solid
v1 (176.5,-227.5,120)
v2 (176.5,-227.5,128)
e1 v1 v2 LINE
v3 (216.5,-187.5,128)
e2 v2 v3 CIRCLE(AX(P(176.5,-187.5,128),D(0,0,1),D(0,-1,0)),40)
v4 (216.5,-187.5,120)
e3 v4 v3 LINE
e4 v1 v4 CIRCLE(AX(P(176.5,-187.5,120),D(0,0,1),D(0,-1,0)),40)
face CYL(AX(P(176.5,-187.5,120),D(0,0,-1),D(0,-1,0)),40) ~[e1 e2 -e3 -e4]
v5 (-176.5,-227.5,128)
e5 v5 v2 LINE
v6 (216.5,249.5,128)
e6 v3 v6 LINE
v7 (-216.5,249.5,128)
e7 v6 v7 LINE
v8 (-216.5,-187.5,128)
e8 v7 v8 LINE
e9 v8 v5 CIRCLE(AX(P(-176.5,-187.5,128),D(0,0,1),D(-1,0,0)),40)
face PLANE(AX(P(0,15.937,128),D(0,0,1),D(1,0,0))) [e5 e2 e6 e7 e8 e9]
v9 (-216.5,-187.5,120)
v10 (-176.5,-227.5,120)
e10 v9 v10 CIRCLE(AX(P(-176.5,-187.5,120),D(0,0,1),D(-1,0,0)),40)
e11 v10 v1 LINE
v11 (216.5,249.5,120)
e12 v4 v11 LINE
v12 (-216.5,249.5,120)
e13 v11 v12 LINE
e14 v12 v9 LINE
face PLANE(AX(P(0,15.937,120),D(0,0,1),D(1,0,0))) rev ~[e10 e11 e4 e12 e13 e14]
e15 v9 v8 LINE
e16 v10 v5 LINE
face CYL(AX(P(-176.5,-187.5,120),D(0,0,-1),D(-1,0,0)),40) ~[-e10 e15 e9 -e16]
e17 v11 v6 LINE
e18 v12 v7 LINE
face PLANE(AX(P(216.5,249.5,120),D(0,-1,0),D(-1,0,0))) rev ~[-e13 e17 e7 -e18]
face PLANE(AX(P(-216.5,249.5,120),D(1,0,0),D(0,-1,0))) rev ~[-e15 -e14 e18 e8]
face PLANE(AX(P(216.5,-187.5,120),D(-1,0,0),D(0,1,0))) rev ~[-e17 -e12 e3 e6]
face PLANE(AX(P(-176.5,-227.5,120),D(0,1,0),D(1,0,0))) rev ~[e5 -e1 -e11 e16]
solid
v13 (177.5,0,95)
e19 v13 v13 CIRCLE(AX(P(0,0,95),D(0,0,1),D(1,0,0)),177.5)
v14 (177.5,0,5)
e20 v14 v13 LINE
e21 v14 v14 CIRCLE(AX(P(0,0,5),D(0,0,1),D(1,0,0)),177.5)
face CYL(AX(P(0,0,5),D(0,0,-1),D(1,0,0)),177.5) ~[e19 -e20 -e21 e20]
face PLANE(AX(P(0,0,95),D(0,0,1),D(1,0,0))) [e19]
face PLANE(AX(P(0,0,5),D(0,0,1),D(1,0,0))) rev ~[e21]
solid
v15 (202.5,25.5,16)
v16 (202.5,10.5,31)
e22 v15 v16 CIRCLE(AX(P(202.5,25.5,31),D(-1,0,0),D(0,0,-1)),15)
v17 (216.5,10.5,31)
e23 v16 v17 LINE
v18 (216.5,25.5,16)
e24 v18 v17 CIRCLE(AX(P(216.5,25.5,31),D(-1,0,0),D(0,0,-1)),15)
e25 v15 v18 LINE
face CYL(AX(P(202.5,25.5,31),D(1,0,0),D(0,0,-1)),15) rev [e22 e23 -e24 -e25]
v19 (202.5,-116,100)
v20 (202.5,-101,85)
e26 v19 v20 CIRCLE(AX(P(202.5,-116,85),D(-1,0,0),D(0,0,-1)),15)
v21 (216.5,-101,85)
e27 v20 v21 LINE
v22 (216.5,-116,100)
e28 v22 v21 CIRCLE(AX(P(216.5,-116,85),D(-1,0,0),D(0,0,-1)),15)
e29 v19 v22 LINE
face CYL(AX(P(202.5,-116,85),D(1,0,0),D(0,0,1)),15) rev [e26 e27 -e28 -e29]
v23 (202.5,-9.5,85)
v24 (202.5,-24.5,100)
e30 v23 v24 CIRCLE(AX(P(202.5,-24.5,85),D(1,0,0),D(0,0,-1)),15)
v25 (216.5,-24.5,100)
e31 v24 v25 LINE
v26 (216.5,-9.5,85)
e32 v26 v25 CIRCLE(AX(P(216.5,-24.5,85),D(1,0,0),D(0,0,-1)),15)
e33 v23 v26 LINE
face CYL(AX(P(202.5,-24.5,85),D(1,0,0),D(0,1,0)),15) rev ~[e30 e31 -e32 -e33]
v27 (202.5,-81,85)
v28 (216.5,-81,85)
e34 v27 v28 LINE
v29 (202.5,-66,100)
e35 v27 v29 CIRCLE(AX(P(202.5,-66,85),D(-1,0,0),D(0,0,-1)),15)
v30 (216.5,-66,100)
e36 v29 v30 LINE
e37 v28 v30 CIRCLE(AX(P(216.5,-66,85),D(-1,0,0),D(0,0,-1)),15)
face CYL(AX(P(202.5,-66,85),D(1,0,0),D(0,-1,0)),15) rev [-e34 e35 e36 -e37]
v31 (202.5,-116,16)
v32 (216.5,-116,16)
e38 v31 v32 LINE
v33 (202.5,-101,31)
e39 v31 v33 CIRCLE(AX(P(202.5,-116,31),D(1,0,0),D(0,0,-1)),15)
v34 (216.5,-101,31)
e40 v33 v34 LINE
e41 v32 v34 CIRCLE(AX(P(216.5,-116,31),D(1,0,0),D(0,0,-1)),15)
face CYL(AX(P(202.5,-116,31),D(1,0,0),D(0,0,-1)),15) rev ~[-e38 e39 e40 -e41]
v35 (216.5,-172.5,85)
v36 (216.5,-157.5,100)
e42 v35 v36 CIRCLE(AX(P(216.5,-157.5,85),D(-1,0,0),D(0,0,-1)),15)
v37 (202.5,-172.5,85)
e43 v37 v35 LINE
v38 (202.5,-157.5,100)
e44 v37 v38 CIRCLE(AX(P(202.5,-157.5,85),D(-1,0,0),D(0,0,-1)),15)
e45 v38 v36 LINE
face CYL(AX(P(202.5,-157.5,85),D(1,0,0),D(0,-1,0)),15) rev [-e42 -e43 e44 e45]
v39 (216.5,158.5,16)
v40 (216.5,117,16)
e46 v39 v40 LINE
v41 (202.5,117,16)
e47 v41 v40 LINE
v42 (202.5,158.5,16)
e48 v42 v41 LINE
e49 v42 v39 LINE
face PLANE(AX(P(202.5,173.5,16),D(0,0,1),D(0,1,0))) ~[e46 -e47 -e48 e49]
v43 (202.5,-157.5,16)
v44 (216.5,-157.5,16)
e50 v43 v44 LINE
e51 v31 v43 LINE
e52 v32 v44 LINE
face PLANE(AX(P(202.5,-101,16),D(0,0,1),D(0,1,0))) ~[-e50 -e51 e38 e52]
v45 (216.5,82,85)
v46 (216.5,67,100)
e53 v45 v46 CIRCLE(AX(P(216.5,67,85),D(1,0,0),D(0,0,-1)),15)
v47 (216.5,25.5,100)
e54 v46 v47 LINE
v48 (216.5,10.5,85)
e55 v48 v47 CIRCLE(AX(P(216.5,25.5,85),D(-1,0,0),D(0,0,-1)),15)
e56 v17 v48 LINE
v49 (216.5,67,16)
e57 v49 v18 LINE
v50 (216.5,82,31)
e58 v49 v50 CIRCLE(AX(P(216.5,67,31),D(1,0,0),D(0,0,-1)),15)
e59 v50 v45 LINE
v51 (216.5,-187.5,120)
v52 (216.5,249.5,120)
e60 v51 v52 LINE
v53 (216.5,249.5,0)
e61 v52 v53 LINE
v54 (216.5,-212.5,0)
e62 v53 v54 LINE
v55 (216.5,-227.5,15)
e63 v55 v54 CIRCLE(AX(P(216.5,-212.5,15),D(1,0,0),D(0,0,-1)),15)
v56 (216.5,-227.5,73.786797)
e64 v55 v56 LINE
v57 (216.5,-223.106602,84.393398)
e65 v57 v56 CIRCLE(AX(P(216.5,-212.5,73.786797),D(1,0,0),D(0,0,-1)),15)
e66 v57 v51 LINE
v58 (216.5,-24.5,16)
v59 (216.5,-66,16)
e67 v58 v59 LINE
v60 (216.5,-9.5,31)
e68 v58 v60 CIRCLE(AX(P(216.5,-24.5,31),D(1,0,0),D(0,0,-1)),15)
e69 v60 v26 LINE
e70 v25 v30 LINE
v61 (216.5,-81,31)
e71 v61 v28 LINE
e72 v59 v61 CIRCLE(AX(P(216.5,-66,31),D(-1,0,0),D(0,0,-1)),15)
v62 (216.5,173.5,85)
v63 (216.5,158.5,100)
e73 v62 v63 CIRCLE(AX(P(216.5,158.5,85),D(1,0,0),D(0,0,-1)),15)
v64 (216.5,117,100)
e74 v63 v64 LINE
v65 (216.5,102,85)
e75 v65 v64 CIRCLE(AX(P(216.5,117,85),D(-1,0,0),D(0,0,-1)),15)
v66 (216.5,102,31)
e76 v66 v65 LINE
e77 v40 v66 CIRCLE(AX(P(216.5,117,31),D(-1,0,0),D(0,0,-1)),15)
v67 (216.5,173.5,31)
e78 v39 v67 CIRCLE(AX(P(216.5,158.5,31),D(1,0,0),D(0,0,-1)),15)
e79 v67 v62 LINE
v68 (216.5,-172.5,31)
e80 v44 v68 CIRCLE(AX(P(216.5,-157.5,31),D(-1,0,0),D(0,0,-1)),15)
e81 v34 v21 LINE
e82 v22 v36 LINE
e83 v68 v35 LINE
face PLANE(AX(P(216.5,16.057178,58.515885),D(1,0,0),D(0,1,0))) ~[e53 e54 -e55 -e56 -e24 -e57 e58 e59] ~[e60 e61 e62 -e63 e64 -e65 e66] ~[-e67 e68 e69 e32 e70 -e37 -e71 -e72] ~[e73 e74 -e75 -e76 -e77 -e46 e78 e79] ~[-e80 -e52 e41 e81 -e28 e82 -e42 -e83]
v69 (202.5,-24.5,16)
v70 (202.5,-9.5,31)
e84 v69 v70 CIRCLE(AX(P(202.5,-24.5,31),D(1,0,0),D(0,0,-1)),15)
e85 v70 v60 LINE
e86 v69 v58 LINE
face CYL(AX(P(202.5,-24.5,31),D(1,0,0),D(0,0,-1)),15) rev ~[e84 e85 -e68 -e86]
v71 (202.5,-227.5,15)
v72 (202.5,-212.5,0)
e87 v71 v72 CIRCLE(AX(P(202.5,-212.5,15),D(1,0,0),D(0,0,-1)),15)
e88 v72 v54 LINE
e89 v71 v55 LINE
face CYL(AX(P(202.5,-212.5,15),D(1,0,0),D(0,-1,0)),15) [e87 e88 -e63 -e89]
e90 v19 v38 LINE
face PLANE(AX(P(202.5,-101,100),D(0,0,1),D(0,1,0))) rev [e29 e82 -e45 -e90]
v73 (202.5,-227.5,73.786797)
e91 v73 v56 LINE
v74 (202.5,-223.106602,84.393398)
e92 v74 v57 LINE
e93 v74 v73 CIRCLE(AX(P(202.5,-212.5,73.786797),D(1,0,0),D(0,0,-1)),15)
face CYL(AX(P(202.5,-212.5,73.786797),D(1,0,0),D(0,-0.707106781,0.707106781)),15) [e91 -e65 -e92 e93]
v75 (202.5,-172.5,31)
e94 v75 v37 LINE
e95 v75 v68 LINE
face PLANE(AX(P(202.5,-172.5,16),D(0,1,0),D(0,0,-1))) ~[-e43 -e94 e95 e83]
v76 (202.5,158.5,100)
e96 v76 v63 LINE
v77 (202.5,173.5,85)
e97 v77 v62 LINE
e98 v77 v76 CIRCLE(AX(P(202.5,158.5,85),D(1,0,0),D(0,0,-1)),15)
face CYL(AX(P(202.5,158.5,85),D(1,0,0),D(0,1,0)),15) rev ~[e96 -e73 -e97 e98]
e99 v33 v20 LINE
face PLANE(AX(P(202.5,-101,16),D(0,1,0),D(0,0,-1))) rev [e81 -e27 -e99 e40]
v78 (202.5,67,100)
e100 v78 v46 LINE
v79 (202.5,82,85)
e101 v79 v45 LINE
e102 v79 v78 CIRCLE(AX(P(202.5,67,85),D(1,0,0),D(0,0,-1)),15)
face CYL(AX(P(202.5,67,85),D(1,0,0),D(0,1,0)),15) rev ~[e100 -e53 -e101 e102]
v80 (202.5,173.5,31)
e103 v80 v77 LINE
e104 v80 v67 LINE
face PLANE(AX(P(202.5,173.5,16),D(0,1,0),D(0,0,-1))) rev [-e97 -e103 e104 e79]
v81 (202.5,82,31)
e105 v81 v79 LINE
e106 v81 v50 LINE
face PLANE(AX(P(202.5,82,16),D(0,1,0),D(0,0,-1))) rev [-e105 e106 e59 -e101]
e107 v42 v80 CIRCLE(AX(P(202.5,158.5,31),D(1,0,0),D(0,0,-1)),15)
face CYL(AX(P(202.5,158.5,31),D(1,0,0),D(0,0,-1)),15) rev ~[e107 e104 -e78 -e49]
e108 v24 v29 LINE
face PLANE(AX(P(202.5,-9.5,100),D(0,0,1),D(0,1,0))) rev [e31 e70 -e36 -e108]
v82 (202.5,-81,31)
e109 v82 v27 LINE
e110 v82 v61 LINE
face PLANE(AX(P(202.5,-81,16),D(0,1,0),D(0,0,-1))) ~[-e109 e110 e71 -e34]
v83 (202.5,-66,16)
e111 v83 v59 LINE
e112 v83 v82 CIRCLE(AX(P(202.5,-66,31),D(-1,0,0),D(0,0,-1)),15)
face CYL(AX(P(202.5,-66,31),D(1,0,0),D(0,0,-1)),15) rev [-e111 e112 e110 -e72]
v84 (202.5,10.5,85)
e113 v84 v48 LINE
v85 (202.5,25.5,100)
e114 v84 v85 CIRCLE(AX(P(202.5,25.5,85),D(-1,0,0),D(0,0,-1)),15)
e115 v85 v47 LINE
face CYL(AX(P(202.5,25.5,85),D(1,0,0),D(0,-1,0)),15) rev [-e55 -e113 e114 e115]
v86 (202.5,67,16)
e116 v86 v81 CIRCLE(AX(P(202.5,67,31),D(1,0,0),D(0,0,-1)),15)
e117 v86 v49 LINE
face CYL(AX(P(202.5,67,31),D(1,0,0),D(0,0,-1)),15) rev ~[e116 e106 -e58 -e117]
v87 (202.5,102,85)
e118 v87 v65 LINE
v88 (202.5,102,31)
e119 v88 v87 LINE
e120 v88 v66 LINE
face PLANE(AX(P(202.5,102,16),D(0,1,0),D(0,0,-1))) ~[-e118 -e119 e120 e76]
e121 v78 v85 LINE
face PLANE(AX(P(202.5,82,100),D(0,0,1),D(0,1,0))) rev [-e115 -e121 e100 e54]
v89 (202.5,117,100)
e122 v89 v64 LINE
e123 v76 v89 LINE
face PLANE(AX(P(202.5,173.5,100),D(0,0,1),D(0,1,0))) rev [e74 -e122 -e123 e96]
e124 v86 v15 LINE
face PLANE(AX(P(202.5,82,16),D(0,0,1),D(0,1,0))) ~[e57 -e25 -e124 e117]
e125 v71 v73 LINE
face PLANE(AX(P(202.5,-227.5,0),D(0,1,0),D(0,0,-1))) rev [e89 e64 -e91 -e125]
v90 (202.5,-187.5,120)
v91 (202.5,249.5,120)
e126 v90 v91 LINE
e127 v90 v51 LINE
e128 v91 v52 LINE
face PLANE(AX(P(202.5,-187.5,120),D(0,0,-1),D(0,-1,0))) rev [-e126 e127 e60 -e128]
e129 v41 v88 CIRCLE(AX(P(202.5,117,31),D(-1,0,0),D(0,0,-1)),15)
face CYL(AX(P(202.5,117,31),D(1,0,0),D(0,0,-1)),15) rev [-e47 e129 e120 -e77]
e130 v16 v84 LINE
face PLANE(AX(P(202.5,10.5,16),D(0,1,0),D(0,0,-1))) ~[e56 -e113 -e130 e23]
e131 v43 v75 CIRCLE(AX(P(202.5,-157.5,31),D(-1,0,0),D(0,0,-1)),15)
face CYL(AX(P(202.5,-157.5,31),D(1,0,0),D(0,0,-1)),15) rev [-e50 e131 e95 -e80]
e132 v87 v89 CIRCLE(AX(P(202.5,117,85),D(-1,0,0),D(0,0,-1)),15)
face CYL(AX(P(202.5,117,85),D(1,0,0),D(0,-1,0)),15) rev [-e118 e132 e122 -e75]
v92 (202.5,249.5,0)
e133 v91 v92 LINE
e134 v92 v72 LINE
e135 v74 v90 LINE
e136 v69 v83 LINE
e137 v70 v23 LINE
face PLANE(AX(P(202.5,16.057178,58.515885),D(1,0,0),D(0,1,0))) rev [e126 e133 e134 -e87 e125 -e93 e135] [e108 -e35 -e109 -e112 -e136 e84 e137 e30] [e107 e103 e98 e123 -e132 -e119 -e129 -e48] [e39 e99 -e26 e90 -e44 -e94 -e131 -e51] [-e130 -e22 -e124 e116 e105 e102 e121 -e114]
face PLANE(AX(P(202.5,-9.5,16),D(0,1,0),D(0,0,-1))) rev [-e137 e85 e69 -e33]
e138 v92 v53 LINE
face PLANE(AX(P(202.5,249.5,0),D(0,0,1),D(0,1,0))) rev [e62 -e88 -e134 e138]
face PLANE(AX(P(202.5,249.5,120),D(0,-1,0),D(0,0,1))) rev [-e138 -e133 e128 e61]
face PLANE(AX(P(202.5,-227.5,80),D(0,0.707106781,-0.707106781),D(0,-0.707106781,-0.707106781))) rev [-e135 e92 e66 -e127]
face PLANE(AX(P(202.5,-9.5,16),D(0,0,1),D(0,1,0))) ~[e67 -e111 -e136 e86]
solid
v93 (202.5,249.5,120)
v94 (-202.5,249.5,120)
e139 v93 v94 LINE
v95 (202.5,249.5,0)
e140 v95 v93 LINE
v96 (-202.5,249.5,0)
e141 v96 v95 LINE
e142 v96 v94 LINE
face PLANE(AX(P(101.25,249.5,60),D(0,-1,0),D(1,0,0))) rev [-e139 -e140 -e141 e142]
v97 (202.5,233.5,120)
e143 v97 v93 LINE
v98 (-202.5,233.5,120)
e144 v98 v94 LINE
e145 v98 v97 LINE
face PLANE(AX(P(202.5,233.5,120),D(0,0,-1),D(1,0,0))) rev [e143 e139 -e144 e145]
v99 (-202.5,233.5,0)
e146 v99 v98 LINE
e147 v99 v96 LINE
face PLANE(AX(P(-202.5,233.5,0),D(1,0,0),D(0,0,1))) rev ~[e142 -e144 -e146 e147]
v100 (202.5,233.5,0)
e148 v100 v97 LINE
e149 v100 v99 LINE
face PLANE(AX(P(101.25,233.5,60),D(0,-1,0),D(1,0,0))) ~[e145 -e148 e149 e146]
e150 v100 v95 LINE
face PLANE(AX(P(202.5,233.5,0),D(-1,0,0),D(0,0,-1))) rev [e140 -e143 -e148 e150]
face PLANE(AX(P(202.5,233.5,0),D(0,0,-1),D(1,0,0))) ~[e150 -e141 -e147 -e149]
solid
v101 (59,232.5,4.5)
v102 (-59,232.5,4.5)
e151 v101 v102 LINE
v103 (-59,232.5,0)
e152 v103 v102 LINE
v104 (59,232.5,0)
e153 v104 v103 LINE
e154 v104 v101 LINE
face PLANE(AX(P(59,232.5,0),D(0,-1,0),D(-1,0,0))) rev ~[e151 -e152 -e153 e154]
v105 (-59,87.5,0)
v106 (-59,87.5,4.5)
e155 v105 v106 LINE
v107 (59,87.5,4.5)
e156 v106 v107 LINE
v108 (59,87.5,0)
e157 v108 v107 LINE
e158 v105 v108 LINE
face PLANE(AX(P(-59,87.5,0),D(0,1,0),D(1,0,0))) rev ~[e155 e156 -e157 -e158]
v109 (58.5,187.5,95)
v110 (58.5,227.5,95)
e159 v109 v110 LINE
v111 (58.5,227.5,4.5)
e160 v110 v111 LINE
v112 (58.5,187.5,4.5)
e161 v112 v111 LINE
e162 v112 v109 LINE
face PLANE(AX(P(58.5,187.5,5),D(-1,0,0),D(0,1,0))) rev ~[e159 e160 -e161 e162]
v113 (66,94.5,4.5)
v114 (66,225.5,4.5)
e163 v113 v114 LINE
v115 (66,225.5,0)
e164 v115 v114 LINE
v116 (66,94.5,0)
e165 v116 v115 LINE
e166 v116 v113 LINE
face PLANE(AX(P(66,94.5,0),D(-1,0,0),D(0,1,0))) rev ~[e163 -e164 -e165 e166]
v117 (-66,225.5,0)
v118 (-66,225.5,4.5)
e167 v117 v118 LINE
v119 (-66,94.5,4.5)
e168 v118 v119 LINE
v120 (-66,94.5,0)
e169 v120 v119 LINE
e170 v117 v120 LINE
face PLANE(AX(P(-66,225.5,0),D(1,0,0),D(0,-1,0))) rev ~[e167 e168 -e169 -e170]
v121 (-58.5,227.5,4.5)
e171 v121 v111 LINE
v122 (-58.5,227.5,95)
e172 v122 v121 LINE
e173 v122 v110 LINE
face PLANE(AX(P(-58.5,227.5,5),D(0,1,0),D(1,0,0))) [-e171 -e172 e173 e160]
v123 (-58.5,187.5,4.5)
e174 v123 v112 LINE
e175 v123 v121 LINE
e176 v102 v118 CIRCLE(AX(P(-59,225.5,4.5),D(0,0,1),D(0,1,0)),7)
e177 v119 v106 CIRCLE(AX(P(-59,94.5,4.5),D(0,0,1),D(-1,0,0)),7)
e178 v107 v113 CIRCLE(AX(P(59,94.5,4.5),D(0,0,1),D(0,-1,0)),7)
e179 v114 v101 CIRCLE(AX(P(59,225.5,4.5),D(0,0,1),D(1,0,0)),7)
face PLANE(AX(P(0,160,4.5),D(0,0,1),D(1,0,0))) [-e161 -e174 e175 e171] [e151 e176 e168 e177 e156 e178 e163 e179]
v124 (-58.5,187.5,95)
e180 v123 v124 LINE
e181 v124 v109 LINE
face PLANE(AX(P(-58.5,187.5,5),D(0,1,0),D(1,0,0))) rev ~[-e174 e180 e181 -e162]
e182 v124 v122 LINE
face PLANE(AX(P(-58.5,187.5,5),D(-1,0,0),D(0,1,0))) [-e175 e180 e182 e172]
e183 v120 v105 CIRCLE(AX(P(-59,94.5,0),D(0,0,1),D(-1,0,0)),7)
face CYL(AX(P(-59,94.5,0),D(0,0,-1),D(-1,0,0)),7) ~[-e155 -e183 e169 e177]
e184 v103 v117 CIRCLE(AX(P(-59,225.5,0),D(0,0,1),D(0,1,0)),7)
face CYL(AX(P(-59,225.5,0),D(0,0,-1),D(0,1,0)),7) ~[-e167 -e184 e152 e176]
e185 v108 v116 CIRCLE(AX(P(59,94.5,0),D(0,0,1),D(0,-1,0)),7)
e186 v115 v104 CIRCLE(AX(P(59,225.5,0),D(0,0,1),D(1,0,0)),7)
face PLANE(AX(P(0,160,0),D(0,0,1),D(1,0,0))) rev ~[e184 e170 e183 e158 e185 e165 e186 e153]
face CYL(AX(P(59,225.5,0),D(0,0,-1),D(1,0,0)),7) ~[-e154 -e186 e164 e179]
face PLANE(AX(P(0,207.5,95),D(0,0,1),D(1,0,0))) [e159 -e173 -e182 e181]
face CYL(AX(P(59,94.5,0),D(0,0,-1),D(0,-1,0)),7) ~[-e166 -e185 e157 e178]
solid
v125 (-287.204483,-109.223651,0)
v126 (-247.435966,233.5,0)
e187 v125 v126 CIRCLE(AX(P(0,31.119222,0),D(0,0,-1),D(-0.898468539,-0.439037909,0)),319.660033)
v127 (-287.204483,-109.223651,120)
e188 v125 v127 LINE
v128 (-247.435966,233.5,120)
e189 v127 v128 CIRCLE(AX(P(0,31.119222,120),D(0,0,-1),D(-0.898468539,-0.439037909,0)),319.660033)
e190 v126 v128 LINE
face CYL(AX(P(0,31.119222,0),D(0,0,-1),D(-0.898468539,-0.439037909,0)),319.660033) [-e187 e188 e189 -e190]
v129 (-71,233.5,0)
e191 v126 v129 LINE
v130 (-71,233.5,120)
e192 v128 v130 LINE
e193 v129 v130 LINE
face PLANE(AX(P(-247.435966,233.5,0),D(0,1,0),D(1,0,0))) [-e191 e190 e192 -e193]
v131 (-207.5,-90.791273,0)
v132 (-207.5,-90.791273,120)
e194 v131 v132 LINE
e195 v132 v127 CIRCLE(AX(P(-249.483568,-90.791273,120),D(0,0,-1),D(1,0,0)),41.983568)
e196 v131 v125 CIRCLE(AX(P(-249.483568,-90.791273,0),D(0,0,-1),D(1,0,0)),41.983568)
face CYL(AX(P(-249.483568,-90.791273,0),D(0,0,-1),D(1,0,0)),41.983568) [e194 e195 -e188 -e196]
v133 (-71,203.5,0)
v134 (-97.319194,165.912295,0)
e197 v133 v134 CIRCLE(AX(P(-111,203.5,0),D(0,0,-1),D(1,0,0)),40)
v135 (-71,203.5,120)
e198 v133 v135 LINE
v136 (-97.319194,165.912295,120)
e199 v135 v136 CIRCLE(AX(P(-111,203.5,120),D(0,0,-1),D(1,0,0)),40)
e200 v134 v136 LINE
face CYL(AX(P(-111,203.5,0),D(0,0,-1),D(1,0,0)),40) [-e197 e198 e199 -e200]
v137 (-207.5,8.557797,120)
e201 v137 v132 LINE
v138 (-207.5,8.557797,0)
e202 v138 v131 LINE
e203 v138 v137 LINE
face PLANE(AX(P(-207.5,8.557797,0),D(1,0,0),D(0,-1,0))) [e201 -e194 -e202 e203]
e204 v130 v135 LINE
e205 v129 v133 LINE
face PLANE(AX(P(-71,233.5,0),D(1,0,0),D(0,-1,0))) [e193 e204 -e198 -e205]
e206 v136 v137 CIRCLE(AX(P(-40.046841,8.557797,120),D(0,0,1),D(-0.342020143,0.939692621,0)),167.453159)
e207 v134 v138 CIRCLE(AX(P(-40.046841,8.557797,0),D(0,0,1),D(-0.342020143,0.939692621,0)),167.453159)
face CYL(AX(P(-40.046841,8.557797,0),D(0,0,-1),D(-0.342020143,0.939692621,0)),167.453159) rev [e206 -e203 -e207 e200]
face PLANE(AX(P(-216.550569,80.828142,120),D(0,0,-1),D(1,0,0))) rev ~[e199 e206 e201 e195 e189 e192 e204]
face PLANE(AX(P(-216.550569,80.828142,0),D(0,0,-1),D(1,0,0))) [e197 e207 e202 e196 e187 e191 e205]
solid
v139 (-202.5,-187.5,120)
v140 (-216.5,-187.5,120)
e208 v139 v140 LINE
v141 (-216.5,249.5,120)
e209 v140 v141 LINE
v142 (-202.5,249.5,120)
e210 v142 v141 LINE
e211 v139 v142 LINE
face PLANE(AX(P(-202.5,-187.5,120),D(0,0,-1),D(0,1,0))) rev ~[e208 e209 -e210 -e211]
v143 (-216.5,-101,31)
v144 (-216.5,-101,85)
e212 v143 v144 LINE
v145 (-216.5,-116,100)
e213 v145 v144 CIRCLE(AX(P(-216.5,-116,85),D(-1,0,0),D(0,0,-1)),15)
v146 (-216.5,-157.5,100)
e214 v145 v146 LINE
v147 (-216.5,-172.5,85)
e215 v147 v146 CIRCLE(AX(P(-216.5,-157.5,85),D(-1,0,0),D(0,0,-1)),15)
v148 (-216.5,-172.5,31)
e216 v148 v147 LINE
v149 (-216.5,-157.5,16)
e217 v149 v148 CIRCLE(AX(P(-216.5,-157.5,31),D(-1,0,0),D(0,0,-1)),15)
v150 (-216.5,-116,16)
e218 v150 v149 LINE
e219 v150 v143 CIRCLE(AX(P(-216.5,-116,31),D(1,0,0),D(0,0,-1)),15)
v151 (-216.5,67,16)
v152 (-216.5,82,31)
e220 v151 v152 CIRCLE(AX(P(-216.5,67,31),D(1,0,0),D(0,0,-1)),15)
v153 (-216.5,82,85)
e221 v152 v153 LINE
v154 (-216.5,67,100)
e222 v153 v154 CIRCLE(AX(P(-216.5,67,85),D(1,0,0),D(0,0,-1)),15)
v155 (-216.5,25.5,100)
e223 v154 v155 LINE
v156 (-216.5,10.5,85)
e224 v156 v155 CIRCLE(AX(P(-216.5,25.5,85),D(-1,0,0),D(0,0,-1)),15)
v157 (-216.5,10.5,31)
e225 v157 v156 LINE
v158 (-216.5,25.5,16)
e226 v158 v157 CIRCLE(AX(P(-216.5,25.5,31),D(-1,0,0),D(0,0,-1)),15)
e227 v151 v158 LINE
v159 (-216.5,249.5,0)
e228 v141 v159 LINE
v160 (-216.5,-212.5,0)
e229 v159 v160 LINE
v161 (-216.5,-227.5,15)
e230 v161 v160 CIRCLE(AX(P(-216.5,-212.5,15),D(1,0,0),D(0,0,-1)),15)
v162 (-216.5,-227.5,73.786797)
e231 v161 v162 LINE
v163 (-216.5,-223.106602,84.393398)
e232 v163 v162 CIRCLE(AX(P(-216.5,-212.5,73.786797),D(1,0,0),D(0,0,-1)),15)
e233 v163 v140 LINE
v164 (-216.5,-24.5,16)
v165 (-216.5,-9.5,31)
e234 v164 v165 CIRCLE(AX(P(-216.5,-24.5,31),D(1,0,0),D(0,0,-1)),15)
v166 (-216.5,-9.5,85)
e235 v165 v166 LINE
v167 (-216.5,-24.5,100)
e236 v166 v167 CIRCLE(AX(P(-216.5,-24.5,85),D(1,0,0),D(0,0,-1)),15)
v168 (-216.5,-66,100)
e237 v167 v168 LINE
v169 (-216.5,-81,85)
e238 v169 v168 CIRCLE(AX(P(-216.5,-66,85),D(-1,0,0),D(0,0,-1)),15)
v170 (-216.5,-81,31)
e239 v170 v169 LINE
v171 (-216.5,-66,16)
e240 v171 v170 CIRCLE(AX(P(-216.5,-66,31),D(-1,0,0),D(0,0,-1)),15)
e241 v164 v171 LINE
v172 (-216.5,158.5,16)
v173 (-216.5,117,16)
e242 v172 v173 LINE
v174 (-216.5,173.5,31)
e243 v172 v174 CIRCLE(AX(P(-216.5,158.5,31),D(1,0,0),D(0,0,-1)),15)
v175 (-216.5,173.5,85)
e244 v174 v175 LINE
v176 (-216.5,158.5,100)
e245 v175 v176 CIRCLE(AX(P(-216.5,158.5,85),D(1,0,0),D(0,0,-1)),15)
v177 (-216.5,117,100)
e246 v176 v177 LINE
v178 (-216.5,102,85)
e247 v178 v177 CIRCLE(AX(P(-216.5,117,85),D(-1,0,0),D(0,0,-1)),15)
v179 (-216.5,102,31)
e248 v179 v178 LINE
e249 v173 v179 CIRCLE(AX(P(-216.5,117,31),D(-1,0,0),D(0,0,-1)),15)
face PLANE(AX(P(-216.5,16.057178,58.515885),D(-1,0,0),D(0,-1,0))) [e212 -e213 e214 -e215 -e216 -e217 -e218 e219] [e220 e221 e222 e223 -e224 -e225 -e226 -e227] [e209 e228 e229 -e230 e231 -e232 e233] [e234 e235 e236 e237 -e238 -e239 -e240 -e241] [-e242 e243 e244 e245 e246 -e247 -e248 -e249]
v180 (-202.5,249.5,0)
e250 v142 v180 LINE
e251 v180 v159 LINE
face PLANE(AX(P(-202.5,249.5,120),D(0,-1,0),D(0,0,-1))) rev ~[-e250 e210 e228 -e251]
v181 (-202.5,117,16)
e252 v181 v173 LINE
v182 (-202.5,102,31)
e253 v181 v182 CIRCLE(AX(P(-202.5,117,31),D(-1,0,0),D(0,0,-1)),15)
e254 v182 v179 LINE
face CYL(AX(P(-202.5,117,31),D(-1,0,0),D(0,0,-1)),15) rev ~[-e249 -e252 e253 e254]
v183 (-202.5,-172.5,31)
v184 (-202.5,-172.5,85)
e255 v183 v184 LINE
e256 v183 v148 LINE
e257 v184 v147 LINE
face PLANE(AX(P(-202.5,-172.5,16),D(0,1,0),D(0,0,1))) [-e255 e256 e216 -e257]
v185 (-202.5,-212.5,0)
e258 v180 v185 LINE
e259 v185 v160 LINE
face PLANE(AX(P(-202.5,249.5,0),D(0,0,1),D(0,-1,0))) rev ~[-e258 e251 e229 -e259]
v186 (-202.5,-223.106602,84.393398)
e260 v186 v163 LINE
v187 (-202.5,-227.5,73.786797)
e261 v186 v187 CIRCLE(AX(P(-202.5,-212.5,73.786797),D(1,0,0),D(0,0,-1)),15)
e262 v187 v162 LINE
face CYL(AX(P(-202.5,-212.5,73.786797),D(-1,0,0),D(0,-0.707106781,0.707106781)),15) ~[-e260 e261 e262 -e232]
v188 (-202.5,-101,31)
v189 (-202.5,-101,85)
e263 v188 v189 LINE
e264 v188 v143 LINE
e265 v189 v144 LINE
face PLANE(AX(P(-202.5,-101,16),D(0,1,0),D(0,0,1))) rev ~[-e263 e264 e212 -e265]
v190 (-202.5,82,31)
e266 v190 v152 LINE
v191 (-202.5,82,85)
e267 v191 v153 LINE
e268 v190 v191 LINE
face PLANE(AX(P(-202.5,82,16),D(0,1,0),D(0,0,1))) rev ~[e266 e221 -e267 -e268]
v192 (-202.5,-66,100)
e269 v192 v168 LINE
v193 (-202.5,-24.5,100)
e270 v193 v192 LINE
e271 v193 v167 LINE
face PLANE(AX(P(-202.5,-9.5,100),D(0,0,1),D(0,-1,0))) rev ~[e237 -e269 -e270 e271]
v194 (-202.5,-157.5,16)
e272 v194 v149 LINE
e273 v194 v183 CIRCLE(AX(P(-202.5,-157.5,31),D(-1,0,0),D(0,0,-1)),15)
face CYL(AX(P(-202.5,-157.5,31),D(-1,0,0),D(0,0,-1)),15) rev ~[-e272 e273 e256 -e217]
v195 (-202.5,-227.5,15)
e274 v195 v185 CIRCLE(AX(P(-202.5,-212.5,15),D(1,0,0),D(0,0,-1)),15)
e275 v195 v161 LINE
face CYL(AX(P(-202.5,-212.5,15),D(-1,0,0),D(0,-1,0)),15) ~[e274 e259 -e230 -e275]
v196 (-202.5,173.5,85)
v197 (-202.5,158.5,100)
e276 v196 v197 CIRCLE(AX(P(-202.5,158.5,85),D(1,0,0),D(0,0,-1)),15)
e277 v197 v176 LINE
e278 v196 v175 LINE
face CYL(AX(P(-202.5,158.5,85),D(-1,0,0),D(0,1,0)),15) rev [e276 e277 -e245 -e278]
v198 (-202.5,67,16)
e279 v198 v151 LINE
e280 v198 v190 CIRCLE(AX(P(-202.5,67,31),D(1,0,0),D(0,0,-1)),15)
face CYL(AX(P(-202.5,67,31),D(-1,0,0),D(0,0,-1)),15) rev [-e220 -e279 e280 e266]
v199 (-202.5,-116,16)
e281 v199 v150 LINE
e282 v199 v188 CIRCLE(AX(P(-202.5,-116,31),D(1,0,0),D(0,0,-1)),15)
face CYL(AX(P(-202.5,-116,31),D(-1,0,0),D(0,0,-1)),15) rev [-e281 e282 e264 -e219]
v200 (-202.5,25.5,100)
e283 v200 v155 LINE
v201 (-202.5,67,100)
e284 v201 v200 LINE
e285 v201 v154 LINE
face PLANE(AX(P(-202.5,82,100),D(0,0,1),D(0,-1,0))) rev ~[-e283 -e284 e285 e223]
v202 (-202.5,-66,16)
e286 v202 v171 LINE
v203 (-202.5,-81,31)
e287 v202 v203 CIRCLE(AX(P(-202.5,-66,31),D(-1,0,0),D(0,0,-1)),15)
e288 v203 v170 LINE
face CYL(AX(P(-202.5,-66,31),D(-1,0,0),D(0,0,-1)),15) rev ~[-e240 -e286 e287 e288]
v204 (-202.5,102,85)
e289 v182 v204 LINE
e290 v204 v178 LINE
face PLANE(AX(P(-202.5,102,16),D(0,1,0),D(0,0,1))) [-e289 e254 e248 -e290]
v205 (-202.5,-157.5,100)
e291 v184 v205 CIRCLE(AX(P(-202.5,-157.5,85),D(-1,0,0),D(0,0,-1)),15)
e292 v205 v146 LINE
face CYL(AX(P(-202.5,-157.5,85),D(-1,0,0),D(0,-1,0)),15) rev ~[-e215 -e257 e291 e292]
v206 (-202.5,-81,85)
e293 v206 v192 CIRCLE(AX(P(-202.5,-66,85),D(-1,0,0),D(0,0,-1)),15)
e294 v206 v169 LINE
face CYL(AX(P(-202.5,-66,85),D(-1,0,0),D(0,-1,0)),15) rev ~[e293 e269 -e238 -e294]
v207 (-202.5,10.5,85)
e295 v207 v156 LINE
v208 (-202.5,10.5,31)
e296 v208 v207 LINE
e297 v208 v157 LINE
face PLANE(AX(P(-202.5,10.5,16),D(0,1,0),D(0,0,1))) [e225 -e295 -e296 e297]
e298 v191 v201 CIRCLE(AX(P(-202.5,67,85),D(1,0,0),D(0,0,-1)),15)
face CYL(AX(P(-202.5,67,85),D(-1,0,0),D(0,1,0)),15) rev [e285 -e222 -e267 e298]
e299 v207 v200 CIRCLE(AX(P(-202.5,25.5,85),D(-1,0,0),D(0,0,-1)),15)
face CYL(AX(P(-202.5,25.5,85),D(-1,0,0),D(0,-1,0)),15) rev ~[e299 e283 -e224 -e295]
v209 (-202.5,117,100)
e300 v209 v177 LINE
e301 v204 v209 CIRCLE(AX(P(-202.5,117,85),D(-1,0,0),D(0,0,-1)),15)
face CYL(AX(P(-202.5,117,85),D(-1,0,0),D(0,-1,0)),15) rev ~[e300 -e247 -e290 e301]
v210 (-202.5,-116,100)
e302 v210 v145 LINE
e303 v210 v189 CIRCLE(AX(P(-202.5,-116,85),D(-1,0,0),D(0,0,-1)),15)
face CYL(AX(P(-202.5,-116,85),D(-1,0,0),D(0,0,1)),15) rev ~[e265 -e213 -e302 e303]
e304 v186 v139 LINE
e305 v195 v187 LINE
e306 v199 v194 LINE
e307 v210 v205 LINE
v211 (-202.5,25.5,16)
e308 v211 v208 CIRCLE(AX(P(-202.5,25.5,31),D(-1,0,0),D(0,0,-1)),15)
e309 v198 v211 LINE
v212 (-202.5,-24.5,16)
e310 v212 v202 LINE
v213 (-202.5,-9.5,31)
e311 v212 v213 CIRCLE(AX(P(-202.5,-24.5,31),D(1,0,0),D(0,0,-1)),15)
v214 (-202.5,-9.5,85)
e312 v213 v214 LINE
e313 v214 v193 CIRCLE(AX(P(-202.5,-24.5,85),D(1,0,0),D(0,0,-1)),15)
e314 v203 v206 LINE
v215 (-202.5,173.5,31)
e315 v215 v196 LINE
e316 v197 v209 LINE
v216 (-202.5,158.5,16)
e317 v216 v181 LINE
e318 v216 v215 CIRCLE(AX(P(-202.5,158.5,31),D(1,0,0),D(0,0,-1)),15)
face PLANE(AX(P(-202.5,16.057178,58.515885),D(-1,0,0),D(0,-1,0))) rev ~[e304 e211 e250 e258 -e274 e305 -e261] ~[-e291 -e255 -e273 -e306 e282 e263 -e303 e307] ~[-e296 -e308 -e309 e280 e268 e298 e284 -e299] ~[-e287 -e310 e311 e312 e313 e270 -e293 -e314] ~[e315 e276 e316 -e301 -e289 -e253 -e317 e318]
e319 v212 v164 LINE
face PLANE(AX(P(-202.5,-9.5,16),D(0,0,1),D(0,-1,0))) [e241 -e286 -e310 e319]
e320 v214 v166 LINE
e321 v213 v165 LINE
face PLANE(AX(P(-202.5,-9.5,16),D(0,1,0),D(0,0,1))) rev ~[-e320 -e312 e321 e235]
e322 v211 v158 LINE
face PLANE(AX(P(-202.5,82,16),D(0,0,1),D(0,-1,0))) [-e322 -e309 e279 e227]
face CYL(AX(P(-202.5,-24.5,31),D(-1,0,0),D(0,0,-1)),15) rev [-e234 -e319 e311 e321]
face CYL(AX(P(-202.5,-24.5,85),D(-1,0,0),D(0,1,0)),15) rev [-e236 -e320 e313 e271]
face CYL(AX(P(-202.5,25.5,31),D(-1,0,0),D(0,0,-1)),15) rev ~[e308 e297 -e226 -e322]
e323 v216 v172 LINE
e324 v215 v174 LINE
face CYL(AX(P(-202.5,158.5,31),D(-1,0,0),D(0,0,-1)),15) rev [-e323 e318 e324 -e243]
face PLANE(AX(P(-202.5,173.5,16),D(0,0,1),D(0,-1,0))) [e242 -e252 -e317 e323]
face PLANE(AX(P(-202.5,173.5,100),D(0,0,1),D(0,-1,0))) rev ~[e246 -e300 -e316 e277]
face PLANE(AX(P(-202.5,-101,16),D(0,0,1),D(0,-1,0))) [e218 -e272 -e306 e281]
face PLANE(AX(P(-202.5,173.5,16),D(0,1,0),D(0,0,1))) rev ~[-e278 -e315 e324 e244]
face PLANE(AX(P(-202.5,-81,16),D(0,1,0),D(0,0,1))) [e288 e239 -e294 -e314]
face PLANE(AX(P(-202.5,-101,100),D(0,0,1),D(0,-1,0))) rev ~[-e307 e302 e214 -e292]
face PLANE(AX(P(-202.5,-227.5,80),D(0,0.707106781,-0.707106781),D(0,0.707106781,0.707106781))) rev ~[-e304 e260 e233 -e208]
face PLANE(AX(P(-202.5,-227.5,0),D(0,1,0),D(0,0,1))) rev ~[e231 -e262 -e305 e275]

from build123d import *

# Parameters (mm, degrees)
F2_R          = 177.5
F3_DEPTH      = 90
F4_W          = 117
F4_H          = 40
F5_DEPTH      = 5
F5_DEPTH_BACK = 90
F7_DEPTH      = 4.5
F10_W         = 202.5
F10_H         = 120
F11_DEPTH     = 16
F14_W         = 71.5
F14_H         = 84
F15_DEPTH     = 14
F17_R         = 15
F22_DEPTH     = 8
F24_DEPTH     = 120


# Not quite as in the source:
# - a feature names something its author has since deleted; it is built from what else it names


with BuildPart() as f3:
    # F2 (on plane+point) → F3 (new body)
    with BuildSketch(Plane.XY.offset(5)):
        Circle(F2_R)
    extrude(amount=F3_DEPTH)


with BuildPart() as f5:
    # F4 (on plane+point) → F5 (new body, two sides)
    with BuildSketch(Plane.XY.offset(5)) as f5_sk:
        with Locations((0, 207.5)):
            Rectangle(F4_W, F4_H)
    extrude(amount=-F5_DEPTH)
    extrude(f5_sk.sketch, amount=F5_DEPTH_BACK)

    # F6 (on Top) → F7 (join)
    with BuildSketch(Plane.XY):
        with BuildLine():
            Line((59, 232.5), (-59, 232.5))
            ThreePointArc((-59, 232.5), (-63.9497474683, 230.4497474683), (-66, 225.5))
            Line((-66, 225.5), (-66, 94.5))
            ThreePointArc((-66, 94.5), (-63.9497474683, 89.5502525317), (-59, 87.5))
            Line((-59, 87.5), (59, 87.5))
            ThreePointArc((59, 87.5), (63.9497474683, 89.5502525317), (66, 94.5))
            Line((66, 94.5), (66, 225.5))
            ThreePointArc((66, 225.5), (63.9497474683, 230.4497474683), (59, 232.5))
        make_face()
    extrude(amount=F7_DEPTH)


with BuildPart() as f11:
    # F10 (on plane+point) → F11 (new body)
    with BuildSketch(Plane.XZ.offset(-233.5)):
        with Locations((-101.25, 60)):
            Rectangle(F10_W, F10_H)
    extrude(amount=-F11_DEPTH)


with BuildPart() as f15:
    # F14 (on face) → F15 (new body)
    with BuildSketch(Plane(origin=(-202.5, 0, 0), x_dir=(0, -1, 0), z_dir=(-1, 0, 0))):
        Polygon((187.5, 120), (-249.5, 120), (-249.5, 0), (227.5, 0), (227.5, 80), align=None)
        with Locations((-137.75, 58)):
            Rectangle(F14_W, F14_H, mode=Mode.SUBTRACT)
        with Locations((-46.25, 58)):
            Rectangle(F14_W, F14_H, mode=Mode.SUBTRACT)
        with Locations((45.25, 58)):
            Rectangle(F14_W, F14_H, mode=Mode.SUBTRACT)
        with Locations((136.75, 58)):
            Rectangle(F14_W, F14_H, mode=Mode.SUBTRACT)
    extrude(amount=F15_DEPTH)

    # F17
    f17_edges = [f15.edges().sort_by_distance(p)[0] for p in [
        (-209.5, 82, 100),
        (-209.5, 173.5, 100),
        (-209.5, -227.5, 0),
        (-209.5, -227.5, 80),
        (-209.5, 173.5, 16),
        (-209.5, 10.5, 16),
        (-209.5, 102, 16),
        (-209.5, 102, 100),
        (-209.5, -101, 16),
        (-209.5, -172.5, 16),
        (-209.5, -172.5, 100),
        (-209.5, -101, 100),
        (-209.5, -9.5, 16),
        (-209.5, -9.5, 100),
        (-209.5, -81, 16),
        (-209.5, -81, 100),
        (-209.5, 10.5, 100),
        (-209.5, 82, 16),
    ]]
    fillet(f17_edges, radius=F17_R)


with BuildPart() as f18_1:
    # F18: instance of F11
    add(f11.part.mirror(Plane.YZ))


with BuildPart() as f19_1:
    # F19: instance of F15
    add(f15.part.mirror(Plane.YZ))


with BuildPart() as f22:
    # F21 (on plane+point) → F22 (new body)
    with BuildSketch(Plane.XY.offset(120)):
        with BuildLine():
            Line((216.5, -187.5), (216.5, 249.5))
            Line((216.5, 249.5), (-216.5, 249.5))
            Line((-216.5, 249.5), (-216.5, -187.5))
            ThreePointArc((-216.5, -187.5), (-204.7842712475, -215.7842712475), (-176.5, -227.5))
            Line((-176.5, -227.5), (176.5, -227.5))
            ThreePointArc((176.5, -227.5), (204.7842712475, -215.7842712475), (216.5, -187.5))
        make_face()
    extrude(amount=F22_DEPTH)


with BuildPart() as f11_1:
    add(f11.part)

    # F23: union F18_1
    add(f18_1.part)


with BuildPart() as f24:
    # F12 (on face) → F24 (new body, through all)
    with BuildSketch(Plane(origin=(0, 0, 0), x_dir=(1, 0, 0), z_dir=(0, 0, -1))):
        with BuildLine():
            ThreePointArc((-287.2044828435, 109.2236505243), (-317.5294909897, -67.9642915883), (-247.435966397, -233.5))
            Line((-247.435966397, -233.5), (-202.5, -233.5))
            Line((-202.5, -233.5), (-71, -233.5))
            Line((-71, -233.5), (-71, -203.5))
            ThreePointArc((-71, -203.5), (-78.2339182284, -180.556942546), (-97.319194267, -165.9122951686))
            ThreePointArc((-97.319194267, -165.9122951686), (-177.2164384695, -104.6049834268), (-207.5, -8.5577970797))
            Line((-207.5, -8.5577970797), (-207.5, 90.791272666))
            ThreePointArc((-207.5, 90.791272666), (-240.0241445264, 131.6952979534), (-287.2044828435, 109.2236505243))
        make_face()
    extrude(amount=-F24_DEPTH)


solid = Compound([f3.part, f5.part, f15.part, f19_1.part, f22.part, f11_1.part, f24.part])
